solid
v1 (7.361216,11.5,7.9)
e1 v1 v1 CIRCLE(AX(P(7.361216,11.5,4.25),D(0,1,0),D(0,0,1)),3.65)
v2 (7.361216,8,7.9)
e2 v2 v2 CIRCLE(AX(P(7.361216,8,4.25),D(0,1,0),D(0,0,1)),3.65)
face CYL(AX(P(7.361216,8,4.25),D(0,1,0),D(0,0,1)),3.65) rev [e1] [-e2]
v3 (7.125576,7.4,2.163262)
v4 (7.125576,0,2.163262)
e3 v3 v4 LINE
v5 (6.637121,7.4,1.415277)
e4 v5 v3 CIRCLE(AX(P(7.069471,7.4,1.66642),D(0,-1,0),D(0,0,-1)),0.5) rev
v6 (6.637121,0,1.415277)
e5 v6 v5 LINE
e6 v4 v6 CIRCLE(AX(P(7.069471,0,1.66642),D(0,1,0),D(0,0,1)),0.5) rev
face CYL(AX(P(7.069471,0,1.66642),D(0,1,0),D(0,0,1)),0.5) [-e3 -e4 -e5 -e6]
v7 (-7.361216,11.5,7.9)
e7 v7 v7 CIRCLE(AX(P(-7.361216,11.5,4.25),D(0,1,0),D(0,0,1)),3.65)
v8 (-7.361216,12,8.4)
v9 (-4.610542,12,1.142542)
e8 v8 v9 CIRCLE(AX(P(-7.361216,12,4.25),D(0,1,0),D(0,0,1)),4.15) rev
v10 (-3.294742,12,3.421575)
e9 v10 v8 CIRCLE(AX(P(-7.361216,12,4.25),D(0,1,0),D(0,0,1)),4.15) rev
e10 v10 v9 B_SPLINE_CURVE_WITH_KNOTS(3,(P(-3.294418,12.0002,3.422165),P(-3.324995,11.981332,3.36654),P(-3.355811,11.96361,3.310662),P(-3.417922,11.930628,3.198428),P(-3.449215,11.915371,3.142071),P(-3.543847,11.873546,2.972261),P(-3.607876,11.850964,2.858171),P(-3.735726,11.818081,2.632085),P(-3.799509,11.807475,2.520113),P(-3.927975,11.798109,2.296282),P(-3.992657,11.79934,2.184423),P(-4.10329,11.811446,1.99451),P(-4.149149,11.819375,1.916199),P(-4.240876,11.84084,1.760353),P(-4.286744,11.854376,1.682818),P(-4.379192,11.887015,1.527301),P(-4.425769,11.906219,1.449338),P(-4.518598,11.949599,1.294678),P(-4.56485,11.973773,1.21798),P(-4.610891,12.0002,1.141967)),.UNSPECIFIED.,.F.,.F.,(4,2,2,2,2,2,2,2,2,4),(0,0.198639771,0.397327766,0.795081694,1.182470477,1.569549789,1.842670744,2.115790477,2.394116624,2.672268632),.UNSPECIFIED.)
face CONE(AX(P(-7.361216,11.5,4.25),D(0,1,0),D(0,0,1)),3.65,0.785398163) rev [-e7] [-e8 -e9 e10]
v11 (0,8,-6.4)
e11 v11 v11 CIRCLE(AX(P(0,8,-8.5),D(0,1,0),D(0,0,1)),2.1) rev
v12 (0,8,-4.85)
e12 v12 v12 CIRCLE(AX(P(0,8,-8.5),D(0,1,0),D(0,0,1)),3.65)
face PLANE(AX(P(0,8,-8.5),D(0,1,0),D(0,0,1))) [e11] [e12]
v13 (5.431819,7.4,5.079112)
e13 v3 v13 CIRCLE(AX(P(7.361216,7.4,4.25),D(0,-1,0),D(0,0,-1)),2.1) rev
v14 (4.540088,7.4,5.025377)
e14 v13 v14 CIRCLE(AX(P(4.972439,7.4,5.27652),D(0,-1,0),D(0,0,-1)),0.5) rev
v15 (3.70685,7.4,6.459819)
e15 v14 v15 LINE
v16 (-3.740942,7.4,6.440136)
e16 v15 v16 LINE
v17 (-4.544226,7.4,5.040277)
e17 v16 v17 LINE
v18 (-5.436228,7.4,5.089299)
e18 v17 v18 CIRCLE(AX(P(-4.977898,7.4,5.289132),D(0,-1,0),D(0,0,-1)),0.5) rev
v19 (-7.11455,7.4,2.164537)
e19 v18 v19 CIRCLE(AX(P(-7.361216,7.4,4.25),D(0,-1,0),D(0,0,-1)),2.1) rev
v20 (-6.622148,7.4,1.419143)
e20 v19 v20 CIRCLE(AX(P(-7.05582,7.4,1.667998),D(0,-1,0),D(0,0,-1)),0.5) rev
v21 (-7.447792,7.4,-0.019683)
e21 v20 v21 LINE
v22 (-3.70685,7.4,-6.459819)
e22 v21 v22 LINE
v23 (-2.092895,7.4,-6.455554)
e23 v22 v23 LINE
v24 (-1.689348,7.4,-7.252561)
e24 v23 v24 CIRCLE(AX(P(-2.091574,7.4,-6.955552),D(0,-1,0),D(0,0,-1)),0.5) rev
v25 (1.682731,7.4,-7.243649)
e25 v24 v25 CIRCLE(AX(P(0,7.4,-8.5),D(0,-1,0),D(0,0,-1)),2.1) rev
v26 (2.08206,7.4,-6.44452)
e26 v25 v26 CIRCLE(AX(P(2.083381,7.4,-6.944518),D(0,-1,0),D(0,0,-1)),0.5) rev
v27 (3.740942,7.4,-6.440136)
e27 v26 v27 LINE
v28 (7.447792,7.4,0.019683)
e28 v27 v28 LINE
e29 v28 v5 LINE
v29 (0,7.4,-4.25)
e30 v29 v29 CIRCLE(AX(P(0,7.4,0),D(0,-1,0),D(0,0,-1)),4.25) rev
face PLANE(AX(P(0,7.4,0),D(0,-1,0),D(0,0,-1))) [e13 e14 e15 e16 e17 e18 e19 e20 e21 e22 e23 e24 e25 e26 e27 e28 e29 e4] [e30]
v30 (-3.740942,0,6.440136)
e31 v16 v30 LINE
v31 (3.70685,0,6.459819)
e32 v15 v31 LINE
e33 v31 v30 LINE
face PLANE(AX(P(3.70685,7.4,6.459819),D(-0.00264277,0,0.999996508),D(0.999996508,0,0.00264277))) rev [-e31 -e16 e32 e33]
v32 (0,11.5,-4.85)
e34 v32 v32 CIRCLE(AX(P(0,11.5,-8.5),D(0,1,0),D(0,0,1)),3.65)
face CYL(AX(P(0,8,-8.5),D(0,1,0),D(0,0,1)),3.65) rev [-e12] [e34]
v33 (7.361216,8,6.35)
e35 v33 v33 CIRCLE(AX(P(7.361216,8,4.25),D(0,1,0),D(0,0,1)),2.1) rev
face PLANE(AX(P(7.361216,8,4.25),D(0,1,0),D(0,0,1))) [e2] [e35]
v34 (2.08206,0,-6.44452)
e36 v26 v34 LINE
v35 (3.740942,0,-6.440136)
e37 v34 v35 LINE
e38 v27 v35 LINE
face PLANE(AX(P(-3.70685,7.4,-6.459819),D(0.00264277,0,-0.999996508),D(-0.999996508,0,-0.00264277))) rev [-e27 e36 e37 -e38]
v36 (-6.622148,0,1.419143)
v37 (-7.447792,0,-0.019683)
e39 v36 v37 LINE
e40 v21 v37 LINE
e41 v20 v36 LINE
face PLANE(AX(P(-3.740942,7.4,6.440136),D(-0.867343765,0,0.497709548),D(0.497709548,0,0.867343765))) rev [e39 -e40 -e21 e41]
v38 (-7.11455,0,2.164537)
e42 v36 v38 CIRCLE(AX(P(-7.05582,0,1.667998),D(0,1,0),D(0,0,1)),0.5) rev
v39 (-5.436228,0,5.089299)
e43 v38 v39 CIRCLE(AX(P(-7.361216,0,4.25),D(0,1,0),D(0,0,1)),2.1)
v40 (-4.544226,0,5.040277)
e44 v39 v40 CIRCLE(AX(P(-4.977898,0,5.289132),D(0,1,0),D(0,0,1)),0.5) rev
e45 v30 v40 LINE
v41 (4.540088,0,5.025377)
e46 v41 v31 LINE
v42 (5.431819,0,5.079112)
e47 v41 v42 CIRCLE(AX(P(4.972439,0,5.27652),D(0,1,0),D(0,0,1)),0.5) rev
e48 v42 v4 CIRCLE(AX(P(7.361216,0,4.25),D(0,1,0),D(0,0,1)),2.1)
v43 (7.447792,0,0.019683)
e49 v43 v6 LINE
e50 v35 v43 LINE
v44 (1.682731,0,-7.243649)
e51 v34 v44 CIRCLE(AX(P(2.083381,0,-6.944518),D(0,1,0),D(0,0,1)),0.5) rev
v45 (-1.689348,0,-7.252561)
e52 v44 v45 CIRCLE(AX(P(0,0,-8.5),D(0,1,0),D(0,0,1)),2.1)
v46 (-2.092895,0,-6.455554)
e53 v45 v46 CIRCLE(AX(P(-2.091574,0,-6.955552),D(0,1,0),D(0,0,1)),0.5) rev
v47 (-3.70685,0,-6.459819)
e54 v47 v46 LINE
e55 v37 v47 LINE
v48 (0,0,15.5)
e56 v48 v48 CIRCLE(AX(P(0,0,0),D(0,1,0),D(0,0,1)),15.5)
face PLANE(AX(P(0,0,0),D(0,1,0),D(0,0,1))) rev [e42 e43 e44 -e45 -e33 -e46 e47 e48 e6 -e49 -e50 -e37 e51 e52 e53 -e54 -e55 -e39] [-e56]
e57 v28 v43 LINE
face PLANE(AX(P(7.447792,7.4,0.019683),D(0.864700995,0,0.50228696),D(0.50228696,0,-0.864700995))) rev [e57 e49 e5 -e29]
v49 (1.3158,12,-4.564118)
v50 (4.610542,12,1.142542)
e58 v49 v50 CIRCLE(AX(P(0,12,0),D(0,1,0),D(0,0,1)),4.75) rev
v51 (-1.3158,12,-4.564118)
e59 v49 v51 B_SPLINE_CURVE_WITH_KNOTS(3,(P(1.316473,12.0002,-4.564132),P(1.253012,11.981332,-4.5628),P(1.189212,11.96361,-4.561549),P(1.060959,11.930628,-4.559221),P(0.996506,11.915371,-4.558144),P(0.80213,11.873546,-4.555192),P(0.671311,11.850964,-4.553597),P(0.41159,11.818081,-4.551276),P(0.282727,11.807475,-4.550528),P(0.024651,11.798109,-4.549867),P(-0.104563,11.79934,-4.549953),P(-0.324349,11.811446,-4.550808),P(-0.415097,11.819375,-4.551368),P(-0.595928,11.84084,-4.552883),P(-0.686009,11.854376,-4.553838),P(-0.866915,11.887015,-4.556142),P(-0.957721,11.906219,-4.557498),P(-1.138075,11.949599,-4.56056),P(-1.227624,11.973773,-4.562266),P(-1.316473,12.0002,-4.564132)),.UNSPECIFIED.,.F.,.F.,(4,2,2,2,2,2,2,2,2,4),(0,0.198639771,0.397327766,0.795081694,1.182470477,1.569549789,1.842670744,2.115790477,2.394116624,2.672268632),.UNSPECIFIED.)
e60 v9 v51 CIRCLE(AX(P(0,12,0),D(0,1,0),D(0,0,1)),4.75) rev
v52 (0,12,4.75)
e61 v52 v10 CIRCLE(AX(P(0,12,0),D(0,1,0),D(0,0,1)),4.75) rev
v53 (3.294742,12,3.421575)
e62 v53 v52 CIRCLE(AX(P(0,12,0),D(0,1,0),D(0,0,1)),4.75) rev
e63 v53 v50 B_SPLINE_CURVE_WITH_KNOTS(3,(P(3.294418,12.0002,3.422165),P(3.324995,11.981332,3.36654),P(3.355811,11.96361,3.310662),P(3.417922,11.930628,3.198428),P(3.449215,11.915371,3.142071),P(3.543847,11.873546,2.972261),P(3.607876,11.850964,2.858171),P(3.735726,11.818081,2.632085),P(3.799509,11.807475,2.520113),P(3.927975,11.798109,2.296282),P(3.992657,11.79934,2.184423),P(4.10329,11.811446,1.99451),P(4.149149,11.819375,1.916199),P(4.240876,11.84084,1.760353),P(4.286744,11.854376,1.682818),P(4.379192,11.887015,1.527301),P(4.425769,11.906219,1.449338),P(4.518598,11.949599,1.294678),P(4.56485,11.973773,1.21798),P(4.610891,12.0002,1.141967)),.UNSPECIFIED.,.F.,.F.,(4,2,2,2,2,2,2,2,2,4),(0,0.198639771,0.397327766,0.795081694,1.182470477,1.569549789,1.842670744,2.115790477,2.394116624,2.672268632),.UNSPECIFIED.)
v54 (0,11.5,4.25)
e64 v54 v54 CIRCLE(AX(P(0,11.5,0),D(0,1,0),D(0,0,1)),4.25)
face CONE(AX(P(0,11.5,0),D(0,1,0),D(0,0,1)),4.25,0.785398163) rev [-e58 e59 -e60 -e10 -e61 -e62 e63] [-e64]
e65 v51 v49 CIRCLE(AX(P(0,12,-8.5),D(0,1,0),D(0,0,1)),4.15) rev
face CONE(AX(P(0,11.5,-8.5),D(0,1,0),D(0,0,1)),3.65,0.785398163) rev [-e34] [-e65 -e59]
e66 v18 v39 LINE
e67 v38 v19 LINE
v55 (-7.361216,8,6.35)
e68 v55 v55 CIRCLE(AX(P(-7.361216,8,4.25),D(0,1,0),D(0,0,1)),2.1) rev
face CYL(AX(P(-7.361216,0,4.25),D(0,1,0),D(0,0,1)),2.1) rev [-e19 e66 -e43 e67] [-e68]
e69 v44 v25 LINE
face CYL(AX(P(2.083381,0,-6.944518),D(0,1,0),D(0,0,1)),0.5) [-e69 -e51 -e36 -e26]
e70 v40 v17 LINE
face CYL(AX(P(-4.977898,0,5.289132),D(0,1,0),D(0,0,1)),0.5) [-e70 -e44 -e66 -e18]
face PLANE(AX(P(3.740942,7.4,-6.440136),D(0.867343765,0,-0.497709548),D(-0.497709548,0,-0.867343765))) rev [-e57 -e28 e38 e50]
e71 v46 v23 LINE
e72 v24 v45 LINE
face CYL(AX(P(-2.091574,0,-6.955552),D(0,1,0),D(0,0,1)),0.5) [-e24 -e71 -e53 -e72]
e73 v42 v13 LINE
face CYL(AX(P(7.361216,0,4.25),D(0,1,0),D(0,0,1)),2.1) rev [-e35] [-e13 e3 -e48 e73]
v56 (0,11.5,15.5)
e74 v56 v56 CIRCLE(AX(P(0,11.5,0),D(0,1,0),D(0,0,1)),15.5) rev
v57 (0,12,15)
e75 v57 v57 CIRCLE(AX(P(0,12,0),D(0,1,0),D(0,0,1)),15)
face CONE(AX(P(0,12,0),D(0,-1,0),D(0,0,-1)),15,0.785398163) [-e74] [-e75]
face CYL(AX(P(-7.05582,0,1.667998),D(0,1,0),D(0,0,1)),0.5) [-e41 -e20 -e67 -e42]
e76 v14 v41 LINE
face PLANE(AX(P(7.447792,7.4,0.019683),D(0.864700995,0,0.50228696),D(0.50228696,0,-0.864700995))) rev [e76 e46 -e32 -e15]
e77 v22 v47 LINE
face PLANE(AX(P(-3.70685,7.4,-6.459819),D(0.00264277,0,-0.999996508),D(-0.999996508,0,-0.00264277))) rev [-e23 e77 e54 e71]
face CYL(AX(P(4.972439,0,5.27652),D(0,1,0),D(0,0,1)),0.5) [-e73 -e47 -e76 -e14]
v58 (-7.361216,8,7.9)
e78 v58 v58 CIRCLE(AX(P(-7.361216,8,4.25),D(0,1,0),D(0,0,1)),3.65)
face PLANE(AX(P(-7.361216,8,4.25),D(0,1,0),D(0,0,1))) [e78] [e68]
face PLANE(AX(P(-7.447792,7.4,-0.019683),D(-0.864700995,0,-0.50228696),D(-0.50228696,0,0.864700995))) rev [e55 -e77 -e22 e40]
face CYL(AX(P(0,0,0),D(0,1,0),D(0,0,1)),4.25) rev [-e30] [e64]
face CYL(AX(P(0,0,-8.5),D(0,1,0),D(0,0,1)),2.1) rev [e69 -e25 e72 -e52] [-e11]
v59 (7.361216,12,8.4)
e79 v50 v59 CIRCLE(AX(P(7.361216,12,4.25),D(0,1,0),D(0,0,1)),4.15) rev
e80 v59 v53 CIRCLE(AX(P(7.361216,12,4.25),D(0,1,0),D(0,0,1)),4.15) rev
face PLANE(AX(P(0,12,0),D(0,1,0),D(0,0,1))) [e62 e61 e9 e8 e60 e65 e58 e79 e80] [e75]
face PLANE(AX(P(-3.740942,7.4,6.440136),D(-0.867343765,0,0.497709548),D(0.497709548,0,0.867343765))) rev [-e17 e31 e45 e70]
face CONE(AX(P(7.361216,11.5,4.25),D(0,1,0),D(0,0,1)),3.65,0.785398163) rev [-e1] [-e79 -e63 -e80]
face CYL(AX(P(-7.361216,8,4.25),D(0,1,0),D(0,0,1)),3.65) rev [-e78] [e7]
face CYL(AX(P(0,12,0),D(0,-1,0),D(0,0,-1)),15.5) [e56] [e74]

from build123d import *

# Parameters (mm, degrees)
SKETCH1_R           = 15.5
BOSS_EXTRUDE1_DEPTH = 12
SKETCH2_R           = 2.1
CUT_EXTRUDE1_DEPTH  = 25.989997999
SKETCH3_R           = 4.25
CUT_EXTRUDE2_DEPTH  = 25.989997999
CUT_EXTRUDE3_DEPTH  = 7.4
SKETCH5_R           = 3.65
CUT_EXTRUDE4_DEPTH  = 4
CHAMFER1_SIZE       = 0.5
FILLET_1_R          = 0.5


with BuildPart() as part:
    # Sketch1 → Boss-Extrude1 (new body)
    with BuildSketch(Plane(origin=(0, 0, 0), x_dir=(1, 0, 0), z_dir=(0, 1, 0))):
        with Locations(Location((0, 0, 0), (0, 0, 270))):
            Circle(SKETCH1_R)
    extrude(amount=BOSS_EXTRUDE1_DEPTH)

    # Sketch2 → Cut-Extrude1 (cut, through all)
    with BuildSketch(Plane(origin=(0, 12, 0), x_dir=(1, 0, 0), z_dir=(0, 1, 0))):
        with Locations(Location((0, 8.5, 0), (0, 0, 270))):
            Circle(SKETCH2_R)
        with Locations(Location((7.361215932, -4.25, 0), (0, 0, 270))):
            Circle(SKETCH2_R)
        with Locations(Location((-7.361215932, -4.25, 0), (0, 0, 270))):
            Circle(SKETCH2_R)
    extrude(amount=-CUT_EXTRUDE1_DEPTH, mode=Mode.SUBTRACT)

    # Sketch3 → Cut-Extrude2 (cut, through all)
    with BuildSketch(Plane(origin=(0, 12, 0), x_dir=(1, 0, 0), z_dir=(0, 1, 0))):
        with Locations(Location((0, 0, 0), (0, 0, 270))):
            Circle(SKETCH3_R)
    extrude(amount=-CUT_EXTRUDE2_DEPTH, mode=Mode.SUBTRACT)

    # Sketch4 → Cut-Extrude3 (cut)
    with BuildSketch(Plane.XZ):
        Polygon((3.740942098, -6.44013604), (7.447792464, 0.019682871), (3.706850366, 6.459818911), (-3.740942098, 6.44013604), (-7.447792464, -0.019682871), (-3.706850366, -6.459818911), align=None)
    extrude(amount=-CUT_EXTRUDE3_DEPTH, mode=Mode.SUBTRACT)

    # Sketch5 → Cut-Extrude4 (cut)
    with BuildSketch(Plane(origin=(0, 12, 0), x_dir=(1, 0, 0), z_dir=(0, 1, 0))):
        with Locations(Location((0, 8.5, 0), (0, 0, 270))):
            Circle(SKETCH5_R)
        with Locations(Location((7.361215932, -4.25, 0), (0, 0, 270))):
            Circle(SKETCH5_R)
        with Locations(Location((-7.361215932, -4.25, 0), (0, 0, 270))):
            Circle(SKETCH5_R)
    extrude(amount=-CUT_EXTRUDE4_DEPTH, mode=Mode.SUBTRACT)

    # Chamfer1
    # the kernel refuses this chamfer: 0.5 mm, written as the material it takes off along each edge
    with BuildSketch(Plane(origin=(0, 12, 0), x_dir=(0, 0, 1), z_dir=(-1, 0, 0))) as chamfer1_piece_1:
        Polygon((4.25 + CHAMFER1_SIZE, 0), (4.25, -CHAMFER1_SIZE), (4.25, 0), align=None)
    revolve(axis=Axis((0, 12, 0), (0, 1, 0)), mode=Mode.SUBTRACT)
    with BuildSketch(Plane(origin=(0, 12, 0), x_dir=(0, 0, 1), z_dir=(-1, 0, 0))) as chamfer1_piece_2:
        Polygon((15.5, -CHAMFER1_SIZE), (15.5 - CHAMFER1_SIZE, 0), (15.5, 0), align=None)
    revolve(axis=Axis((0, 12, 0), (0, 1, 0)), mode=Mode.SUBTRACT)
    with BuildSketch(Plane(origin=(0, 12, -8.5), x_dir=(0, 0, 1), z_dir=(-1, 0, 0))) as chamfer1_piece_3:
        Polygon((3.65 + CHAMFER1_SIZE, 0), (3.65, -CHAMFER1_SIZE), (3.65, 0), align=None)
    revolve(axis=Axis((0, 12, -8.5), (0, 1, 0)), mode=Mode.SUBTRACT)
    with BuildSketch(Plane(origin=(7.361215932, 12, 4.25), x_dir=(0, 0, 1), z_dir=(-1, 0, 0))) as chamfer1_piece_4:
        Polygon((3.65 + CHAMFER1_SIZE, 0), (3.65, -CHAMFER1_SIZE), (3.65, 0), align=None)
    revolve(axis=Axis((7.361215932, 12, 4.25), (0, 1, 0)), mode=Mode.SUBTRACT)
    with BuildSketch(Plane(origin=(-7.361215932, 12, 4.25), x_dir=(0, 0, 1), z_dir=(-1, 0, 0))) as chamfer1_piece_5:
        Polygon((3.65 + CHAMFER1_SIZE, 0), (3.65, -CHAMFER1_SIZE), (3.65, 0), align=None)
    revolve(axis=Axis((-7.361215932, 12, 4.25), (0, 1, 0)), mode=Mode.SUBTRACT)

    # Скругление1
    fillet_1_edges = [part.edges().sort_by_distance(p)[0] for p in [
        (5.359734874, 3.7, 3.614332183),
        (5.817474247, 3.7, 2.826321101),
        (-5.809970925, 3.7, 2.834500467),
        (-5.356402996, 3.7, 3.624919933),
        (0.450236051, 3.7, -6.44883265),
        (-0.461071251, 3.7, -6.451241034),
    ]]
    fillet(fillet_1_edges, radius=FILLET_1_R)


solid = part.part
